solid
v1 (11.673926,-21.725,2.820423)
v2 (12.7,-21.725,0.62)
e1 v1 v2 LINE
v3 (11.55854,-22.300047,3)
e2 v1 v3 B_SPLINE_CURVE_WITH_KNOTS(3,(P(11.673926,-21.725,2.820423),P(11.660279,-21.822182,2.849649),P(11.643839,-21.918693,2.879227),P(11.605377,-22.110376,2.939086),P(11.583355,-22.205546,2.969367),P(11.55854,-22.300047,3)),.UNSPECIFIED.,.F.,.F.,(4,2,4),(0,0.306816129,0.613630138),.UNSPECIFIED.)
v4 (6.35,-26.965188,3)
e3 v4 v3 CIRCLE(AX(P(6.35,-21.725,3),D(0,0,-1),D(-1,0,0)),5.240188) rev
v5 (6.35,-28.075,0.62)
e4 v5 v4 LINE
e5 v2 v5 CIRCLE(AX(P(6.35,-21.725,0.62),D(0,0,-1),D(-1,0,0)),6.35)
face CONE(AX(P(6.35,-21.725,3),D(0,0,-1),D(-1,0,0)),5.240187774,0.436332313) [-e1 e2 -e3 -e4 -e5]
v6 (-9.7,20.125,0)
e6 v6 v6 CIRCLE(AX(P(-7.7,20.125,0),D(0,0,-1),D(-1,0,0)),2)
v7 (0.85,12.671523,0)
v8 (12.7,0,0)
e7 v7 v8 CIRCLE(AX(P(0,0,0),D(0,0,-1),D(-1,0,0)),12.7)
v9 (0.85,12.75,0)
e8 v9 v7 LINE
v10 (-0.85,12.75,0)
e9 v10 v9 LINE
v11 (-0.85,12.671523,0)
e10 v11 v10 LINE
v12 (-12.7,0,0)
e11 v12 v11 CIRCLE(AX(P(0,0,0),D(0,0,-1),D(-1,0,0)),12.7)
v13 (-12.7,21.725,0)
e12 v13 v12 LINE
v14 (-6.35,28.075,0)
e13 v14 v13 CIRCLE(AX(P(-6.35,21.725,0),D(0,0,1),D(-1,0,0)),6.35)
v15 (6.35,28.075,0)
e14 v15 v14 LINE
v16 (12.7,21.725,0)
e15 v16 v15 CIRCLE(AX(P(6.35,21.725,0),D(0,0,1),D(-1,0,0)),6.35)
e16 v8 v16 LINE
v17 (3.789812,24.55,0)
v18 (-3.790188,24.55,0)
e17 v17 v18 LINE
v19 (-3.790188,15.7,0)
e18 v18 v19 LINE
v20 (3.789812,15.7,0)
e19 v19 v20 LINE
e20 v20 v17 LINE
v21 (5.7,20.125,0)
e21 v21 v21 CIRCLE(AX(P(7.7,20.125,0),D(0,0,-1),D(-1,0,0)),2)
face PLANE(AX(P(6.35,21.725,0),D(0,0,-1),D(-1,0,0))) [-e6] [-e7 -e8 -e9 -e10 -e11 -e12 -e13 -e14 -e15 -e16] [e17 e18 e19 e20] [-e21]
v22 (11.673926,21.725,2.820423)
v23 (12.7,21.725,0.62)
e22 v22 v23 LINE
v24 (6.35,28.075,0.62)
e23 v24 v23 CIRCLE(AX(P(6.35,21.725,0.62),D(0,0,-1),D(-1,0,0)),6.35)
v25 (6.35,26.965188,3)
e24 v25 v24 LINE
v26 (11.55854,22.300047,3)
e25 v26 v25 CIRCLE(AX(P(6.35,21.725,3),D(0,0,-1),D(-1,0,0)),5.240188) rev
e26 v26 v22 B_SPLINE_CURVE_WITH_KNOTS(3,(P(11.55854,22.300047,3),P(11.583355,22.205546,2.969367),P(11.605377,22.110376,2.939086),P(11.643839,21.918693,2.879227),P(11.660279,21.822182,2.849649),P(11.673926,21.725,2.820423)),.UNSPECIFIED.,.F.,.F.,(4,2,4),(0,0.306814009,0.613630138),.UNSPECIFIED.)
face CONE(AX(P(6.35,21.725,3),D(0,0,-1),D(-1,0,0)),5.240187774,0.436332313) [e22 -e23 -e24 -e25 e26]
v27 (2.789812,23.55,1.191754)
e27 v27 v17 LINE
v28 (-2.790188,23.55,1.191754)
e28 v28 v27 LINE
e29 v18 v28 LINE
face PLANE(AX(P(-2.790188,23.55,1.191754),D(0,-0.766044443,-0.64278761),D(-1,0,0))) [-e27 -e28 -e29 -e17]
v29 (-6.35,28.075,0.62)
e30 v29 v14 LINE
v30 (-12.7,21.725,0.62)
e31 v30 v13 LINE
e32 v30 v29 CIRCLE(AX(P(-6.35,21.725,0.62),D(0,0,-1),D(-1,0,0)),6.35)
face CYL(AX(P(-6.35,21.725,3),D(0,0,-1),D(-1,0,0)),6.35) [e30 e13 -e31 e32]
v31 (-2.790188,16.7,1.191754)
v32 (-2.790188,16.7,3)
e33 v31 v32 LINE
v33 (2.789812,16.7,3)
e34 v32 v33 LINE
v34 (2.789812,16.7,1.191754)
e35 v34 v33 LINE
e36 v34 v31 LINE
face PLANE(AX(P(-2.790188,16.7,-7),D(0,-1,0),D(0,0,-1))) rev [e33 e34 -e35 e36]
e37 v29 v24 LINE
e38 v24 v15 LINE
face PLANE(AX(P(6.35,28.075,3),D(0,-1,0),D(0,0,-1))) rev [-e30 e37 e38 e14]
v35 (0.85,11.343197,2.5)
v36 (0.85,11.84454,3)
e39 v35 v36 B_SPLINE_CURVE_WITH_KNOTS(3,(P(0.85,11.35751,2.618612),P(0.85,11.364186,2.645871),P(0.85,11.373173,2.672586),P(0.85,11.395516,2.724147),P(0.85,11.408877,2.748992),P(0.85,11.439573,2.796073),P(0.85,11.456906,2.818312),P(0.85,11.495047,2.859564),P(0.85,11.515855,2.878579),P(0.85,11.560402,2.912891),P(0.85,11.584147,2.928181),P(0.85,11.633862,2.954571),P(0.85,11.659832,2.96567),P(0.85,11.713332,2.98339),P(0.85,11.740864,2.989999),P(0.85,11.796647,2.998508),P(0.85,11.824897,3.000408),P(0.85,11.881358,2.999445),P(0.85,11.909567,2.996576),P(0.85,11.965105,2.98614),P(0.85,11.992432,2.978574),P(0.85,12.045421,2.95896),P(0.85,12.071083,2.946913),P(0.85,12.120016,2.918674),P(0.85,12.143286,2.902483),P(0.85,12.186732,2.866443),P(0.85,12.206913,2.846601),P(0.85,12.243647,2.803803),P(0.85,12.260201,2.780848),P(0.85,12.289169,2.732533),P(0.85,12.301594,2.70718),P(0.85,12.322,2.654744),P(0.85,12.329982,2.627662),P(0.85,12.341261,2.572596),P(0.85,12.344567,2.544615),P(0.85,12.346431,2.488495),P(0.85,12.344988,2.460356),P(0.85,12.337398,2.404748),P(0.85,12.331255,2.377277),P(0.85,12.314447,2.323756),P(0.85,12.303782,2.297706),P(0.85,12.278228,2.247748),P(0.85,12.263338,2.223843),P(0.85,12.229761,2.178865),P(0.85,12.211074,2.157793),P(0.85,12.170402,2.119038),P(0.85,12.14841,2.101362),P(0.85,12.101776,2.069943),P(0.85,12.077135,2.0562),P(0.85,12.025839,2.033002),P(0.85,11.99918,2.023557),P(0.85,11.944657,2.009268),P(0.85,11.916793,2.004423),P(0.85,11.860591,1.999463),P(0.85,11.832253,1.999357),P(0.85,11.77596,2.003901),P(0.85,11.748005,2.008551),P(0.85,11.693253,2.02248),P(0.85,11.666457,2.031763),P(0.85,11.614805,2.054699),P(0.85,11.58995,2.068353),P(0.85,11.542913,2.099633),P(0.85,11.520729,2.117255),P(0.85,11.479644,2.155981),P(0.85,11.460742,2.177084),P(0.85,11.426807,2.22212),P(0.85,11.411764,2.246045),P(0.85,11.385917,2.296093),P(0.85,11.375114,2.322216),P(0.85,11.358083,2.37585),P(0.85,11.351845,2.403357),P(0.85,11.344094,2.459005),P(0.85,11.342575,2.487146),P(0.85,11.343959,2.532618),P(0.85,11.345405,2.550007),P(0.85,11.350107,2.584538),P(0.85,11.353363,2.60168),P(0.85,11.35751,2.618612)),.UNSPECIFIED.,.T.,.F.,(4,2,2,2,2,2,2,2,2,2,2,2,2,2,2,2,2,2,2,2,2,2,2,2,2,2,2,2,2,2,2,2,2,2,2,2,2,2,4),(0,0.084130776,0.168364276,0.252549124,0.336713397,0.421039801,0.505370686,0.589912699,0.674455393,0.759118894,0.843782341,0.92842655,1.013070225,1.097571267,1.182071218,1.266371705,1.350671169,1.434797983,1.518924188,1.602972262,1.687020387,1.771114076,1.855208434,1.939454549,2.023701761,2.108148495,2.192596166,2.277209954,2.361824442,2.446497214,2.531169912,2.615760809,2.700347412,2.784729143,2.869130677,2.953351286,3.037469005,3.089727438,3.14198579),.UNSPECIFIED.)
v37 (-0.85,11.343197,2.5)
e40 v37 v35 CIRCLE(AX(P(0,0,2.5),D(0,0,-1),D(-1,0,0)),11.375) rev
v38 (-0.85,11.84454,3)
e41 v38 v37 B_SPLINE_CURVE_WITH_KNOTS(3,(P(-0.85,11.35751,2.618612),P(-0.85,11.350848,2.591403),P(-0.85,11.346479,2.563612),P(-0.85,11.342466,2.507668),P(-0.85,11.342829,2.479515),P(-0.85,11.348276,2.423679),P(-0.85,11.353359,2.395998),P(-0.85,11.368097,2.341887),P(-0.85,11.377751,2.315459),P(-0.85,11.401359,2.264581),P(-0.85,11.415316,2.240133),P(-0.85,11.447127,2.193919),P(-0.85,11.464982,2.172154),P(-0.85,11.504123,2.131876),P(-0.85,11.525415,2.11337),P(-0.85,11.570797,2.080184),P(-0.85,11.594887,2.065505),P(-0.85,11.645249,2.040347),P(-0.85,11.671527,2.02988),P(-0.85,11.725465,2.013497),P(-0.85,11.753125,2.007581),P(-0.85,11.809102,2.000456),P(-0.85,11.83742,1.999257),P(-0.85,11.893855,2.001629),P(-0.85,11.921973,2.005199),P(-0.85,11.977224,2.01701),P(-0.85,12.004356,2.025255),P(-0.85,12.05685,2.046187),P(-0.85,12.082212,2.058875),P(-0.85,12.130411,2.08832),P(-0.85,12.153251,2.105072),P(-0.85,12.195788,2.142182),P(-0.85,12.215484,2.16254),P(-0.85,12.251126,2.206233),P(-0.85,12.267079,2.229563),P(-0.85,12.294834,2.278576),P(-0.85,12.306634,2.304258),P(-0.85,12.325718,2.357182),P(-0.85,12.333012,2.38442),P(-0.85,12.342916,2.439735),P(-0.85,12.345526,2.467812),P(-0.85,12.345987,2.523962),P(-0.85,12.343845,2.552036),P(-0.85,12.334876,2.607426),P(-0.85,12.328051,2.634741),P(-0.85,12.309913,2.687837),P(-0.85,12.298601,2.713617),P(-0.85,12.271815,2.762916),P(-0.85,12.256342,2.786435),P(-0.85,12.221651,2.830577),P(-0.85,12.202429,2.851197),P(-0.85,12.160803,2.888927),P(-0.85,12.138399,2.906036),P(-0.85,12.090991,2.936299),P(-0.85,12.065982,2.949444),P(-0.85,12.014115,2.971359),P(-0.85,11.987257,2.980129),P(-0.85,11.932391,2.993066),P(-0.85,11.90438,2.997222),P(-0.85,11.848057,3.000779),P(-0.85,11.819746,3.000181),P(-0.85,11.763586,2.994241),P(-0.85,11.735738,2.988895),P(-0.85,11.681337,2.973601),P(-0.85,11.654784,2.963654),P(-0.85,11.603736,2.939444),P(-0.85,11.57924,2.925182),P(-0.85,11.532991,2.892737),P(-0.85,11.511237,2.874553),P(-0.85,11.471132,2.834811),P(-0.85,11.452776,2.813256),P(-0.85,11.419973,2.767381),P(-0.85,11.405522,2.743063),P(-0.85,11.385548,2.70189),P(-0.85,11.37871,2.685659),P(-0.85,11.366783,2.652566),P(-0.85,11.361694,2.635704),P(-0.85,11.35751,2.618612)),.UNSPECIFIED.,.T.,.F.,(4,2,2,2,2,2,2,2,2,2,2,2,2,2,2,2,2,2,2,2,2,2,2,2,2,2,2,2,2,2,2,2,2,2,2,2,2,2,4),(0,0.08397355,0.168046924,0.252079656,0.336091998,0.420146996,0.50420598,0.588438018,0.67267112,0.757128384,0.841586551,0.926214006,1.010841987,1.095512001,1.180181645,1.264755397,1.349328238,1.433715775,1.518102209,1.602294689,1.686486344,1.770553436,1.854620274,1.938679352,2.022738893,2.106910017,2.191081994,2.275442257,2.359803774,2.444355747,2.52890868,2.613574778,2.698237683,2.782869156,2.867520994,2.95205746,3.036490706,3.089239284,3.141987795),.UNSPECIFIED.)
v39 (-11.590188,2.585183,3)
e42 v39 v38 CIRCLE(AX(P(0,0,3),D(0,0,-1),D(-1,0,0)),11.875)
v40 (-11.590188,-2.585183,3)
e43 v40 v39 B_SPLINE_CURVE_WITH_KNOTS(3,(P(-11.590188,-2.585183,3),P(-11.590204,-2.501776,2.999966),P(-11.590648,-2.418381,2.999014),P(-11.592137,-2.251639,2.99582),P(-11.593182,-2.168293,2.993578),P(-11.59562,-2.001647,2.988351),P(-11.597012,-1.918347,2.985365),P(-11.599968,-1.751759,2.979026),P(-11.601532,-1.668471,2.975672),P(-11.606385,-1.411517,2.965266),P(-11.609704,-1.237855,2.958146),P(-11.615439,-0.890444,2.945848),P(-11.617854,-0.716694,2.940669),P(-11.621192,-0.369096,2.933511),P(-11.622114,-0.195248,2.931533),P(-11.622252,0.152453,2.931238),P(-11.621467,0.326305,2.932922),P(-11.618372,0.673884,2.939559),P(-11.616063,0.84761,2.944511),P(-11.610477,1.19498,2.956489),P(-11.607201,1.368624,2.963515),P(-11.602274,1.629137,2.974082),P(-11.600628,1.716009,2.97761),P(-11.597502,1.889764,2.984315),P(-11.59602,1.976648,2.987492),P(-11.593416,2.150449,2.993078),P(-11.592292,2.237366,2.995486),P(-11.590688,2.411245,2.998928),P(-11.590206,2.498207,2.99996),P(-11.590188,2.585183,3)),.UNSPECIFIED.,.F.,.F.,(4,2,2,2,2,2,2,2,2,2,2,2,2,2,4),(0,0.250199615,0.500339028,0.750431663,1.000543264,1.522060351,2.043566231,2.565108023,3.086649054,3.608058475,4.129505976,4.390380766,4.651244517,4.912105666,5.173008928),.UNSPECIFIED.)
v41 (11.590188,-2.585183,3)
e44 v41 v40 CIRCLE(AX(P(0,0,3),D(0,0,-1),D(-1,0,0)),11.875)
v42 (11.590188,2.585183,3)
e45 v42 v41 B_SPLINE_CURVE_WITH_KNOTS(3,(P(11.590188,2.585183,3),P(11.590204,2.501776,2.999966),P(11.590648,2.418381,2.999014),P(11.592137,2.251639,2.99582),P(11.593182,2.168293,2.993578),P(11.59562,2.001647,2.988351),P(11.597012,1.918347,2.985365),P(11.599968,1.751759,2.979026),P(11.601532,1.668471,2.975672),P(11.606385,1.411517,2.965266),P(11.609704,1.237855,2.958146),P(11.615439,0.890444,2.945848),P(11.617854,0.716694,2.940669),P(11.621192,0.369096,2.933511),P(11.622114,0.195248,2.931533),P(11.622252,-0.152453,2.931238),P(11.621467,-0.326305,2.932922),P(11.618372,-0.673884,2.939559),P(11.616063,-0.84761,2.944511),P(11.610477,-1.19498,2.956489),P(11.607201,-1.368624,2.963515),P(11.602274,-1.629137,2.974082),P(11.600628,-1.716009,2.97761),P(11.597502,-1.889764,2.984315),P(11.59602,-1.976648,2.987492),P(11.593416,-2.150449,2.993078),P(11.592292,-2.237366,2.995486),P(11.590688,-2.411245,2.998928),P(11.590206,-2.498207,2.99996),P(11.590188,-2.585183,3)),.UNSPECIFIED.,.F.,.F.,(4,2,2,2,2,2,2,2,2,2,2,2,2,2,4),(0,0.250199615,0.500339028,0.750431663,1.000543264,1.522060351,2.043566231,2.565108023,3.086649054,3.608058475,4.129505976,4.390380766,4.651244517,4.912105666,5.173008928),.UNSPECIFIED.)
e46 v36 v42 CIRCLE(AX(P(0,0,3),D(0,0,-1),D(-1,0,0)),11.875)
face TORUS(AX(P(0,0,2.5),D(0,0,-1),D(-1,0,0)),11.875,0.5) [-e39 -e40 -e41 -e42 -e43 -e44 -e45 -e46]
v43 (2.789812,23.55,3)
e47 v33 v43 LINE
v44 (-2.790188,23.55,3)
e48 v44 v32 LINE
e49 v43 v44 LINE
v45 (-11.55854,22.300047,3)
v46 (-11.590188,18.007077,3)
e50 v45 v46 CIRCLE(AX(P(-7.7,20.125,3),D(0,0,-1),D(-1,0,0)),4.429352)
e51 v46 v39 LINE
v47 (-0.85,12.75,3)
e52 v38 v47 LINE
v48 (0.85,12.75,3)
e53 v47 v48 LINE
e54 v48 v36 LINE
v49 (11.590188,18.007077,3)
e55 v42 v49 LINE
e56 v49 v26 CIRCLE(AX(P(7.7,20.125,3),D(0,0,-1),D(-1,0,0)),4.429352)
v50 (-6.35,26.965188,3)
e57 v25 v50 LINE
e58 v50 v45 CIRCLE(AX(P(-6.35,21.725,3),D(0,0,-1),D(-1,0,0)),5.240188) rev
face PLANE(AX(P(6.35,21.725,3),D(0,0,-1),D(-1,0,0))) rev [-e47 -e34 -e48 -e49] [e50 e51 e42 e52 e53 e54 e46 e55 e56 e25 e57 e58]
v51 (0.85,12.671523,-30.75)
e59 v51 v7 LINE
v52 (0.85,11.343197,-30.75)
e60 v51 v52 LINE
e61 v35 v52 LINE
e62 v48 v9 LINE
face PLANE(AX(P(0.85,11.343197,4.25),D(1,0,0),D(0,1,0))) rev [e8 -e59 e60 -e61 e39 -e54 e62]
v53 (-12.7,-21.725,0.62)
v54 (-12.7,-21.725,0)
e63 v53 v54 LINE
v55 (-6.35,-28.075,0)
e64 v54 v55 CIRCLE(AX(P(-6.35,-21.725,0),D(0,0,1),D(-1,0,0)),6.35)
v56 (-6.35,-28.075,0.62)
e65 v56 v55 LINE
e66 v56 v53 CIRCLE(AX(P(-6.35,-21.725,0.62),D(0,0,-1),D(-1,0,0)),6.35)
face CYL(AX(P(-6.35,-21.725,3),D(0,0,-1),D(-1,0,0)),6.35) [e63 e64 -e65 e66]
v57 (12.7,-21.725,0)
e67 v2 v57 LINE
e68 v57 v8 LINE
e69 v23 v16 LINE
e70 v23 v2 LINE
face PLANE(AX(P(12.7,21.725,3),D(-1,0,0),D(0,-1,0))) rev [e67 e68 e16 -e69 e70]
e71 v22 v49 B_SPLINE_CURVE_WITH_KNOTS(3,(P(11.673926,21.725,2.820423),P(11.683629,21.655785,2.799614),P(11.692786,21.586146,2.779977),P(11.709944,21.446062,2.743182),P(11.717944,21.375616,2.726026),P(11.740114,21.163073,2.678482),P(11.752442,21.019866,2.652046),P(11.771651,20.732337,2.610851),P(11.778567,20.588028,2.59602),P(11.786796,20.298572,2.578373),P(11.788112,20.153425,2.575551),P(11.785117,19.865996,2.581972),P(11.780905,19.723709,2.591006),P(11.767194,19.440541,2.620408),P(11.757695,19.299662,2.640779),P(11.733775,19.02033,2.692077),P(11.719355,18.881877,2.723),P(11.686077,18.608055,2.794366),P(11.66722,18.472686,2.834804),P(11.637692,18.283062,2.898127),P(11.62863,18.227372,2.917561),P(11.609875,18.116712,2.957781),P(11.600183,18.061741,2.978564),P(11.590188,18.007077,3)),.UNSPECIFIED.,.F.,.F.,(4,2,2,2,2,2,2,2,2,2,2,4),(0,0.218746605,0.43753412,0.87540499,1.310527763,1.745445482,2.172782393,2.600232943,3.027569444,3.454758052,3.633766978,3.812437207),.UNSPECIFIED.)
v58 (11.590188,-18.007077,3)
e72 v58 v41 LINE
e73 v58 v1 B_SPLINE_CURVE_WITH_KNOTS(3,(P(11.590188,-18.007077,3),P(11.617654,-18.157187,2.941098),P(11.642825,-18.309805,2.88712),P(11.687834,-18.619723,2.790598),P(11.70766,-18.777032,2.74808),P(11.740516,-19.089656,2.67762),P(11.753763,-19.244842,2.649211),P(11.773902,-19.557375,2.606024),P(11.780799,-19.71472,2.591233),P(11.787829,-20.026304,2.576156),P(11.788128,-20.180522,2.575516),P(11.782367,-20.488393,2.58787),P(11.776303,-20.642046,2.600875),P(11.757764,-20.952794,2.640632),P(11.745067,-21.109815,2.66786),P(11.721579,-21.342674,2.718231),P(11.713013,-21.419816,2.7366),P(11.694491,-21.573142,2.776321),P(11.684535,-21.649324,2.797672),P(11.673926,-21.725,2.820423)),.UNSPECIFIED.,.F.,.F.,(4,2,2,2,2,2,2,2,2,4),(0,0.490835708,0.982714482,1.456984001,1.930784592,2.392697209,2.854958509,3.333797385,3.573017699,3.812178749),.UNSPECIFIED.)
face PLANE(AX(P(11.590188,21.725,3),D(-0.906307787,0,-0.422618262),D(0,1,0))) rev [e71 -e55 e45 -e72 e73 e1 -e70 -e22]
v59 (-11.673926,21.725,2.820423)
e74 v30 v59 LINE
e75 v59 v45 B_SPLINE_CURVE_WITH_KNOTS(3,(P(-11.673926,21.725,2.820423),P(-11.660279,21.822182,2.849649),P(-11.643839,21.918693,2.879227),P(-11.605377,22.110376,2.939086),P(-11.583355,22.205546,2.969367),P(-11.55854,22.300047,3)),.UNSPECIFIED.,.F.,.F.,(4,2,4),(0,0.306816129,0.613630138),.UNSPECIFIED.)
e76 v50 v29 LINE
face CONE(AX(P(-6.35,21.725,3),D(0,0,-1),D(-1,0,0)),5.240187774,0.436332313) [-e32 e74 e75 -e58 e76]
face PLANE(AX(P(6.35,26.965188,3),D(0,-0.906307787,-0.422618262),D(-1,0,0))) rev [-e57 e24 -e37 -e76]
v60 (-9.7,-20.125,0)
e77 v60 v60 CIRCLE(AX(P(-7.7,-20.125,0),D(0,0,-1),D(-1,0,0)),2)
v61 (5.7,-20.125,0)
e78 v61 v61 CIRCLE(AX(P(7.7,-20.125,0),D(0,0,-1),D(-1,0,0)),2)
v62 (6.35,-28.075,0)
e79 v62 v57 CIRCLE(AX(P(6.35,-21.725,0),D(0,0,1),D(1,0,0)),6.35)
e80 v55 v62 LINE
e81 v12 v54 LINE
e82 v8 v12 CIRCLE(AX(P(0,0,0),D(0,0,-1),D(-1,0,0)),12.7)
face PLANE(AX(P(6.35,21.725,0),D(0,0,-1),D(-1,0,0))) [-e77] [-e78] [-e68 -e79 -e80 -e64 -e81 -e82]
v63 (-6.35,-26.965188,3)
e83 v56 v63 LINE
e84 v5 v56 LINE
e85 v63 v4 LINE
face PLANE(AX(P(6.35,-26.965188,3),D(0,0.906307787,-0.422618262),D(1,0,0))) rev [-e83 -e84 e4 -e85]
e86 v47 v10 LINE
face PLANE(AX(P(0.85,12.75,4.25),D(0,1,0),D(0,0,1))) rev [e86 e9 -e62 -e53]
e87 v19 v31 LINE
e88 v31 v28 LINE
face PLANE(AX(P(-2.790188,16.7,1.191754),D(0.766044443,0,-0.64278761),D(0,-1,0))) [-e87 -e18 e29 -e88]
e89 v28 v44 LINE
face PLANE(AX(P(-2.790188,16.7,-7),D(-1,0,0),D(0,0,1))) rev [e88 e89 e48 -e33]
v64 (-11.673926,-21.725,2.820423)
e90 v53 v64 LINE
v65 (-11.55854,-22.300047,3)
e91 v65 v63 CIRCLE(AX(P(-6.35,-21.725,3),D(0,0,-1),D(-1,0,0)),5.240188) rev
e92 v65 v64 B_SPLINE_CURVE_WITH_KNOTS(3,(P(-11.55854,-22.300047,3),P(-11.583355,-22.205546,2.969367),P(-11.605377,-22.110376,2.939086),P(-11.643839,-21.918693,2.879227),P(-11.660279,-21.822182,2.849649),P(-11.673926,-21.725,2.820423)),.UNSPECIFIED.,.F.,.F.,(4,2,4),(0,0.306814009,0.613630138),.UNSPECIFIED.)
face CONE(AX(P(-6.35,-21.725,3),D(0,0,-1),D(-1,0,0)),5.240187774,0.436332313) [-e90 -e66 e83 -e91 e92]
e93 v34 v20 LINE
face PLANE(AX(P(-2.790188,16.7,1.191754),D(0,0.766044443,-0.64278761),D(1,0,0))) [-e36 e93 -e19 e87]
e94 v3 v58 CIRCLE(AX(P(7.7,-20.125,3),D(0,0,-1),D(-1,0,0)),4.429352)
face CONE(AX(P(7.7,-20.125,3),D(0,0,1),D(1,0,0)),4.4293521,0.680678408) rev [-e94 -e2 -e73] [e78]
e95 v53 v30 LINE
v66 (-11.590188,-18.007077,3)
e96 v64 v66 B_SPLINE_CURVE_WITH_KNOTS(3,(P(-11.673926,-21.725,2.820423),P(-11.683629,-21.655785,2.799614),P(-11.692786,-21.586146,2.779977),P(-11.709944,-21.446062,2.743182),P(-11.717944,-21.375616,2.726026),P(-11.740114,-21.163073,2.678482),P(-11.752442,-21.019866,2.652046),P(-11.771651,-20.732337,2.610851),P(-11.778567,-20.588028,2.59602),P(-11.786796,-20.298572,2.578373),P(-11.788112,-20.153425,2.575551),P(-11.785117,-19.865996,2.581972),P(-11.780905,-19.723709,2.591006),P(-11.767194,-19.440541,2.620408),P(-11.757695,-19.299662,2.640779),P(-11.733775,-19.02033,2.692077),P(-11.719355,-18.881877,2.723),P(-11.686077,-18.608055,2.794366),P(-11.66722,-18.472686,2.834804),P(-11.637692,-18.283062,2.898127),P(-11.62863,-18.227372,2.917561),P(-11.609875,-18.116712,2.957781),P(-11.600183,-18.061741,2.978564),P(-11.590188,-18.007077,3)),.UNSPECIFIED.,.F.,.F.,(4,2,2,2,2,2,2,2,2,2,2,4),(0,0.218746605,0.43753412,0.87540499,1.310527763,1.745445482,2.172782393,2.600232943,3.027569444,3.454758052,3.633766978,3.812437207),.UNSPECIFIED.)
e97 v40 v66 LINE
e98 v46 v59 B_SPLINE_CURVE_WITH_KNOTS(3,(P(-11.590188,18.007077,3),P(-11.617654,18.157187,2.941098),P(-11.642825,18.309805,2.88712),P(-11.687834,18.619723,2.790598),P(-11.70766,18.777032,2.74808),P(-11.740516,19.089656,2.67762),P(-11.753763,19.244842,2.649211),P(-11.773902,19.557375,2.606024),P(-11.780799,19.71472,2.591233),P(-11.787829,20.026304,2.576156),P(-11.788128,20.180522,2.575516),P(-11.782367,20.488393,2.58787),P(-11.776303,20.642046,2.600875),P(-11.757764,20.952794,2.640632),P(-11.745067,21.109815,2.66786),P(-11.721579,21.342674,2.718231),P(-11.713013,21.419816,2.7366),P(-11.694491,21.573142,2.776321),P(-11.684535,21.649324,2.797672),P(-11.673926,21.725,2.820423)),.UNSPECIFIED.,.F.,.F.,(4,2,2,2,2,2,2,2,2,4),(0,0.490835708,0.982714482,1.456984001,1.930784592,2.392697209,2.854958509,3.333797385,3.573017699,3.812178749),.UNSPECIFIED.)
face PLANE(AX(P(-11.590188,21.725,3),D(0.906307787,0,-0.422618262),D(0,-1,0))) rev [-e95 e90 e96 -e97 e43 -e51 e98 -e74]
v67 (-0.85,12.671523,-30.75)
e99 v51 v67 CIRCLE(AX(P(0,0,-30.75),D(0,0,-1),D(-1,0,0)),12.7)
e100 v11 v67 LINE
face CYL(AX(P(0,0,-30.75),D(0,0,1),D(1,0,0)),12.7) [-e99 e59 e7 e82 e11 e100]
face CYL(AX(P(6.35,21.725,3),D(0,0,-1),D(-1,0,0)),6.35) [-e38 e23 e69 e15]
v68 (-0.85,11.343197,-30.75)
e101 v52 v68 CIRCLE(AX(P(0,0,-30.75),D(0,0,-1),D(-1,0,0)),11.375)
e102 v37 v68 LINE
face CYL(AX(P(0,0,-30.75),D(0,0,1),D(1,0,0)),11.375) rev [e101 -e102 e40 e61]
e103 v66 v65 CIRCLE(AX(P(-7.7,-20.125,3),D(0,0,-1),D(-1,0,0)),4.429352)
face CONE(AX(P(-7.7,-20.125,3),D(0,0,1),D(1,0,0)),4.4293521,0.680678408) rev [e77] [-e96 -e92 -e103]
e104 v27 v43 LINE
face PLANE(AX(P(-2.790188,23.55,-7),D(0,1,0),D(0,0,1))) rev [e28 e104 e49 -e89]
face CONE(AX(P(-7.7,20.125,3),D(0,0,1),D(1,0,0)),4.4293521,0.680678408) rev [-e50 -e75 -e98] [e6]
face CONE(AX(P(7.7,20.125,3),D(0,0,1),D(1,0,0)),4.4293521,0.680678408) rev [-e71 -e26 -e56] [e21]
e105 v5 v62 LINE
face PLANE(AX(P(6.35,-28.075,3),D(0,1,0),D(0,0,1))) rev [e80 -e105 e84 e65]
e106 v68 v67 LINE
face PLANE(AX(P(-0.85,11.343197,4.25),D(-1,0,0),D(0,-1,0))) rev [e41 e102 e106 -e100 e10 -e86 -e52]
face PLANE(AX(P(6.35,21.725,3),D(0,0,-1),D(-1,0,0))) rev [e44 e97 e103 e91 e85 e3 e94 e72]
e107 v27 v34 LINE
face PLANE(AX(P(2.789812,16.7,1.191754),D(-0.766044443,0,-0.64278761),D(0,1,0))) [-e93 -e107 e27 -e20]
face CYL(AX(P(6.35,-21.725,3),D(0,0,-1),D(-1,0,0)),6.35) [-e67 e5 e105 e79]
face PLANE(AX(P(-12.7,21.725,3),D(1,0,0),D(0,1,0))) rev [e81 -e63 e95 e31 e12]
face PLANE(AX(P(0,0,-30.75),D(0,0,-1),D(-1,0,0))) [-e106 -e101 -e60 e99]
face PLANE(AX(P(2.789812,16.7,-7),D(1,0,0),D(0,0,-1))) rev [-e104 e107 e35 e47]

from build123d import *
from OCP.BRepFilletAPI import BRepFilletAPI_MakeChamfer

# Parameters (mm, degrees)
BOSS_EXTRUDE1_DEPTH = 3
SKETCH2_R           = 2
CUT_EXTRUDE1_DEPTH  = 31.959580504
CHAMFER1_SIZE       = 2.38
CHAMFER1_SIZE2      = 1.109812226
SKETCH3_R           = 12.7
SKETCH3_R_2         = 11.375
BOSS_EXTRUDE2_DEPTH = 30.75
SKETCH5_W           = 5.58
SKETCH5_H           = 6.85
CUT_EXTRUDE3_DEPTH  = 10
CHAMFER3_SIZE       = 1
CHAMFER3_SIZE2      = 1.191753593
CUT_EXTRUDE4_START  = -5
SKETCH6_R           = 11.375
CUT_EXTRUDE4_DEPTH  = 5
CHAMFER4_SIZE       = 2.4293521
CHAMFER4_SIZE_2     = 3
FILLET1_R           = 0.5
CUT_EXTRUDE6_START  = -35
CUT_EXTRUDE6_DEPTH  = 35


with BuildPart() as part:
    # Sketch1 → Boss-Extrude1 (new body)
    with BuildSketch(Plane.XY):
        with BuildLine():
            Line((6.35, 28.075), (-6.35, 28.075))
            ThreePointArc((-6.35, 28.075), (-10.840128061, 26.215128061), (-12.7, 21.725))
            Line((-12.7, 21.725), (-12.7, -21.725))
            ThreePointArc((-12.7, -21.725), (-10.840128061, -26.215128061), (-6.35, -28.075))
            Line((-6.35, -28.075), (6.35, -28.075))
            ThreePointArc((6.35, -28.075), (10.840128061, -26.215128061), (12.7, -21.725))
            Line((12.7, -21.725), (12.7, 21.725))
            ThreePointArc((12.7, 21.725), (10.840128061, 26.215128061), (6.35, 28.075))
        make_face()
    extrude(amount=BOSS_EXTRUDE1_DEPTH)

    # Sketch2 → Cut-Extrude1 (cut, through all)
    with BuildSketch(Plane(origin=(0, 0, 0), x_dir=(-1, 0, 0), z_dir=(0, 0, -1))):
        with Locations((-7.7, -20.125)):
            Circle(SKETCH2_R)
        with Locations((-7.7, 20.125)):
            Circle(SKETCH2_R)
        with Locations((7.7, 20.125)):
            Circle(SKETCH2_R)
        with Locations((7.7, -20.125)):
            Circle(SKETCH2_R)
    extrude(amount=-CUT_EXTRUDE1_DEPTH, mode=Mode.SUBTRACT)

    # Chamfer1: one chamfer whose edges measure the first distance from different faces: ONE call of the kernel's chamfer builder (chamfer() names one face for all edges)
    chamfer1_edges_1 = [part.edges().sort_by_distance(p)[0] for p in [
        (-10.840128061, 26.215128061, 3),
    ]]
    chamfer1_side_1 = [part.faces().sort_by_distance(p)[0] for p in [
        (-10.840128061, 26.215128061, 1.5),
    ]]
    chamfer1_edges_2 = [part.edges().sort_by_distance(p)[0] for p in [
        (-12.7, 0, 3),
    ]]
    chamfer1_side_2 = [part.faces().sort_by_distance(p)[0] for p in [
        (-12.7, 0, 1.5),
    ]]
    chamfer1_edges_3 = [part.edges().sort_by_distance(p)[0] for p in [
        (-10.840128061, -26.215128061, 3),
    ]]
    chamfer1_side_3 = [part.faces().sort_by_distance(p)[0] for p in [
        (-10.840128061, -26.215128061, 1.5),
    ]]
    chamfer1_edges_4 = [part.edges().sort_by_distance(p)[0] for p in [
        (0, -28.075, 3),
    ]]
    chamfer1_side_4 = [part.faces().sort_by_distance(p)[0] for p in [
        (0, -28.075, 1.5),
    ]]
    chamfer1_edges_5 = [part.edges().sort_by_distance(p)[0] for p in [
        (10.840128061, -26.215128061, 3),
    ]]
    chamfer1_side_5 = [part.faces().sort_by_distance(p)[0] for p in [
        (10.840128061, -26.215128061, 1.5),
    ]]
    chamfer1_edges_6 = [part.edges().sort_by_distance(p)[0] for p in [
        (12.7, 0, 3),
    ]]
    chamfer1_side_6 = [part.faces().sort_by_distance(p)[0] for p in [
        (12.7, 0, 1.5),
    ]]
    chamfer1_edges_7 = [part.edges().sort_by_distance(p)[0] for p in [
        (10.840128061, 26.215128061, 3),
    ]]
    chamfer1_side_7 = [part.faces().sort_by_distance(p)[0] for p in [
        (10.840128061, 26.215128061, 1.5),
    ]]
    chamfer1_edges_8 = [part.edges().sort_by_distance(p)[0] for p in [
        (0, 28.075, 3),
    ]]
    chamfer1_side_8 = [part.faces().sort_by_distance(p)[0] for p in [
        (0, 28.075, 1.5),
    ]]
    chamfer1 = BRepFilletAPI_MakeChamfer(part.part.solid().wrapped)
    for e in chamfer1_edges_1:
        chamfer1.Add(CHAMFER1_SIZE, CHAMFER1_SIZE2, e.wrapped, chamfer1_side_1[0].wrapped)  # the first distance lies on this face
    for e in chamfer1_edges_2:
        chamfer1.Add(CHAMFER1_SIZE, CHAMFER1_SIZE2, e.wrapped, chamfer1_side_2[0].wrapped)  # the first distance lies on this face
    for e in chamfer1_edges_3:
        chamfer1.Add(CHAMFER1_SIZE, CHAMFER1_SIZE2, e.wrapped, chamfer1_side_3[0].wrapped)  # the first distance lies on this face
    for e in chamfer1_edges_4:
        chamfer1.Add(CHAMFER1_SIZE, CHAMFER1_SIZE2, e.wrapped, chamfer1_side_4[0].wrapped)  # the first distance lies on this face
    for e in chamfer1_edges_5:
        chamfer1.Add(CHAMFER1_SIZE, CHAMFER1_SIZE2, e.wrapped, chamfer1_side_5[0].wrapped)  # the first distance lies on this face
    for e in chamfer1_edges_6:
        chamfer1.Add(CHAMFER1_SIZE, CHAMFER1_SIZE2, e.wrapped, chamfer1_side_6[0].wrapped)  # the first distance lies on this face
    for e in chamfer1_edges_7:
        chamfer1.Add(CHAMFER1_SIZE, CHAMFER1_SIZE2, e.wrapped, chamfer1_side_7[0].wrapped)  # the first distance lies on this face
    for e in chamfer1_edges_8:
        chamfer1.Add(CHAMFER1_SIZE, CHAMFER1_SIZE2, e.wrapped, chamfer1_side_8[0].wrapped)  # the first distance lies on this face
    add(Compound.cast(chamfer1.Shape()), mode=Mode.REPLACE)

    # Sketch3 → Boss-Extrude2 (add)
    with BuildSketch(Plane(origin=(0, 0, 0), x_dir=(-1, 0, 0), z_dir=(0, 0, -1))):
        Circle(SKETCH3_R)
        Circle(SKETCH3_R_2, mode=Mode.SUBTRACT)
    extrude(amount=BOSS_EXTRUDE2_DEPTH)

    # Sketch5 → Cut-Extrude3 (cut)
    with BuildSketch(Plane.XY.offset(3)):
        with Locations((-0.000187774, 20.125)):
            Rectangle(SKETCH5_W, SKETCH5_H)
    extrude(amount=-CUT_EXTRUDE3_DEPTH, mode=Mode.SUBTRACT)

    # Chamfer3
    chamfer3_edges = [part.edges().sort_by_distance(p)[0] for p in [
        (2.789812226, 20.125, 0),
        (-0.000187774, 16.7, 0),
        (-2.790187774, 20.125, 0),
        (-0.000187774, 23.55, 0),
    ]]
    chamfer3_side = [part.faces().sort_by_distance(p)[0] for p in [
        (10.572418738, 25.947418738, 0),
    ]]
    chamfer(chamfer3_edges, length=CHAMFER3_SIZE, length2=CHAMFER3_SIZE2, reference=chamfer3_side[0])

    # Sketch6 → Cut-Extrude4 (cut)
    with BuildSketch(Plane(origin=(0, 0, 0), x_dir=(-1, 0, 0), z_dir=(0, 0, -1)).offset(CUT_EXTRUDE4_START)):
        Circle(SKETCH6_R)
    extrude(amount=CUT_EXTRUDE4_DEPTH, mode=Mode.SUBTRACT)

    # Chamfer4
    # the kernel refuses this chamfer: 3, 2.4293521 mm, written as the material it takes off along each edge
    with BuildSketch(Plane(origin=(7.7, -20.125, 3), x_dir=(-1, 0, 0), z_dir=(0, -1, 0))) as chamfer4_piece_1:
        Polygon((2 + CHAMFER4_SIZE, 0), (2, CHAMFER4_SIZE_2), (2, 0), align=None)
    revolve(axis=Axis((7.7, -20.125, 3), (0, 0, -1)), mode=Mode.SUBTRACT)
    with BuildSketch(Plane(origin=(-7.7, 20.125, 3), x_dir=(-1, 0, 0), z_dir=(0, -1, 0))) as chamfer4_piece_2:
        Polygon((2 + CHAMFER4_SIZE, 0), (2, CHAMFER4_SIZE_2), (2, 0), align=None)
    revolve(axis=Axis((-7.7, 20.125, 3), (0, 0, -1)), mode=Mode.SUBTRACT)
    with BuildSketch(Plane(origin=(-7.7, -20.125, 3), x_dir=(-1, 0, 0), z_dir=(0, -1, 0))) as chamfer4_piece_3:
        Polygon((2 + CHAMFER4_SIZE, 0), (2, CHAMFER4_SIZE_2), (2, 0), align=None)
    revolve(axis=Axis((-7.7, -20.125, 3), (0, 0, -1)), mode=Mode.SUBTRACT)
    with BuildSketch(Plane(origin=(7.7, 20.125, 3), x_dir=(-1, 0, 0), z_dir=(0, -1, 0))) as chamfer4_piece_4:
        Polygon((2, CHAMFER4_SIZE_2), (2 + CHAMFER4_SIZE, 0), (2, 0), align=None)
    revolve(axis=Axis((7.7, 20.125, 3), (0, 0, -1)), mode=Mode.SUBTRACT)

    # Fillet1
    # the kernel refuses this fillet: 0.5 mm, written as the material it takes off along each edge
    with BuildSketch(Plane(origin=(0, 0, 3), x_dir=(-1, 0, 0), z_dir=(0, 1, 0))) as fillet1_piece_1:
        with BuildLine():
            CenterArc((11.375 + FILLET1_R, -FILLET1_R), FILLET1_R, 90, 90)
            Line((11.375, -FILLET1_R), (11.375, 0))
            Line((11.375, 0), (11.375 + FILLET1_R, 0))
        make_face()
    revolve(axis=Axis((0, 0, 3), (0, 0, 1)), mode=Mode.SUBTRACT)

    # Sketch7 → Cut-Extrude6 (cut)
    with BuildSketch(Plane(origin=(0, 0, -30.75), x_dir=(-1, 0, 0), z_dir=(0, 0, -1)).offset(CUT_EXTRUDE6_START)):
        with BuildLine():
            Line((-0.85, 11.343197301), (-0.85, 12.75))
            Line((-0.85, 12.75), (0.85, 12.75))
            Line((0.85, 12.75), (0.85, 11.343197301))
            ThreePointArc((0.85, 11.343197301), (0, 11.375), (-0.85, 11.343197301))
        make_face()
    extrude(amount=CUT_EXTRUDE6_DEPTH, mode=Mode.SUBTRACT)


solid = part.part
